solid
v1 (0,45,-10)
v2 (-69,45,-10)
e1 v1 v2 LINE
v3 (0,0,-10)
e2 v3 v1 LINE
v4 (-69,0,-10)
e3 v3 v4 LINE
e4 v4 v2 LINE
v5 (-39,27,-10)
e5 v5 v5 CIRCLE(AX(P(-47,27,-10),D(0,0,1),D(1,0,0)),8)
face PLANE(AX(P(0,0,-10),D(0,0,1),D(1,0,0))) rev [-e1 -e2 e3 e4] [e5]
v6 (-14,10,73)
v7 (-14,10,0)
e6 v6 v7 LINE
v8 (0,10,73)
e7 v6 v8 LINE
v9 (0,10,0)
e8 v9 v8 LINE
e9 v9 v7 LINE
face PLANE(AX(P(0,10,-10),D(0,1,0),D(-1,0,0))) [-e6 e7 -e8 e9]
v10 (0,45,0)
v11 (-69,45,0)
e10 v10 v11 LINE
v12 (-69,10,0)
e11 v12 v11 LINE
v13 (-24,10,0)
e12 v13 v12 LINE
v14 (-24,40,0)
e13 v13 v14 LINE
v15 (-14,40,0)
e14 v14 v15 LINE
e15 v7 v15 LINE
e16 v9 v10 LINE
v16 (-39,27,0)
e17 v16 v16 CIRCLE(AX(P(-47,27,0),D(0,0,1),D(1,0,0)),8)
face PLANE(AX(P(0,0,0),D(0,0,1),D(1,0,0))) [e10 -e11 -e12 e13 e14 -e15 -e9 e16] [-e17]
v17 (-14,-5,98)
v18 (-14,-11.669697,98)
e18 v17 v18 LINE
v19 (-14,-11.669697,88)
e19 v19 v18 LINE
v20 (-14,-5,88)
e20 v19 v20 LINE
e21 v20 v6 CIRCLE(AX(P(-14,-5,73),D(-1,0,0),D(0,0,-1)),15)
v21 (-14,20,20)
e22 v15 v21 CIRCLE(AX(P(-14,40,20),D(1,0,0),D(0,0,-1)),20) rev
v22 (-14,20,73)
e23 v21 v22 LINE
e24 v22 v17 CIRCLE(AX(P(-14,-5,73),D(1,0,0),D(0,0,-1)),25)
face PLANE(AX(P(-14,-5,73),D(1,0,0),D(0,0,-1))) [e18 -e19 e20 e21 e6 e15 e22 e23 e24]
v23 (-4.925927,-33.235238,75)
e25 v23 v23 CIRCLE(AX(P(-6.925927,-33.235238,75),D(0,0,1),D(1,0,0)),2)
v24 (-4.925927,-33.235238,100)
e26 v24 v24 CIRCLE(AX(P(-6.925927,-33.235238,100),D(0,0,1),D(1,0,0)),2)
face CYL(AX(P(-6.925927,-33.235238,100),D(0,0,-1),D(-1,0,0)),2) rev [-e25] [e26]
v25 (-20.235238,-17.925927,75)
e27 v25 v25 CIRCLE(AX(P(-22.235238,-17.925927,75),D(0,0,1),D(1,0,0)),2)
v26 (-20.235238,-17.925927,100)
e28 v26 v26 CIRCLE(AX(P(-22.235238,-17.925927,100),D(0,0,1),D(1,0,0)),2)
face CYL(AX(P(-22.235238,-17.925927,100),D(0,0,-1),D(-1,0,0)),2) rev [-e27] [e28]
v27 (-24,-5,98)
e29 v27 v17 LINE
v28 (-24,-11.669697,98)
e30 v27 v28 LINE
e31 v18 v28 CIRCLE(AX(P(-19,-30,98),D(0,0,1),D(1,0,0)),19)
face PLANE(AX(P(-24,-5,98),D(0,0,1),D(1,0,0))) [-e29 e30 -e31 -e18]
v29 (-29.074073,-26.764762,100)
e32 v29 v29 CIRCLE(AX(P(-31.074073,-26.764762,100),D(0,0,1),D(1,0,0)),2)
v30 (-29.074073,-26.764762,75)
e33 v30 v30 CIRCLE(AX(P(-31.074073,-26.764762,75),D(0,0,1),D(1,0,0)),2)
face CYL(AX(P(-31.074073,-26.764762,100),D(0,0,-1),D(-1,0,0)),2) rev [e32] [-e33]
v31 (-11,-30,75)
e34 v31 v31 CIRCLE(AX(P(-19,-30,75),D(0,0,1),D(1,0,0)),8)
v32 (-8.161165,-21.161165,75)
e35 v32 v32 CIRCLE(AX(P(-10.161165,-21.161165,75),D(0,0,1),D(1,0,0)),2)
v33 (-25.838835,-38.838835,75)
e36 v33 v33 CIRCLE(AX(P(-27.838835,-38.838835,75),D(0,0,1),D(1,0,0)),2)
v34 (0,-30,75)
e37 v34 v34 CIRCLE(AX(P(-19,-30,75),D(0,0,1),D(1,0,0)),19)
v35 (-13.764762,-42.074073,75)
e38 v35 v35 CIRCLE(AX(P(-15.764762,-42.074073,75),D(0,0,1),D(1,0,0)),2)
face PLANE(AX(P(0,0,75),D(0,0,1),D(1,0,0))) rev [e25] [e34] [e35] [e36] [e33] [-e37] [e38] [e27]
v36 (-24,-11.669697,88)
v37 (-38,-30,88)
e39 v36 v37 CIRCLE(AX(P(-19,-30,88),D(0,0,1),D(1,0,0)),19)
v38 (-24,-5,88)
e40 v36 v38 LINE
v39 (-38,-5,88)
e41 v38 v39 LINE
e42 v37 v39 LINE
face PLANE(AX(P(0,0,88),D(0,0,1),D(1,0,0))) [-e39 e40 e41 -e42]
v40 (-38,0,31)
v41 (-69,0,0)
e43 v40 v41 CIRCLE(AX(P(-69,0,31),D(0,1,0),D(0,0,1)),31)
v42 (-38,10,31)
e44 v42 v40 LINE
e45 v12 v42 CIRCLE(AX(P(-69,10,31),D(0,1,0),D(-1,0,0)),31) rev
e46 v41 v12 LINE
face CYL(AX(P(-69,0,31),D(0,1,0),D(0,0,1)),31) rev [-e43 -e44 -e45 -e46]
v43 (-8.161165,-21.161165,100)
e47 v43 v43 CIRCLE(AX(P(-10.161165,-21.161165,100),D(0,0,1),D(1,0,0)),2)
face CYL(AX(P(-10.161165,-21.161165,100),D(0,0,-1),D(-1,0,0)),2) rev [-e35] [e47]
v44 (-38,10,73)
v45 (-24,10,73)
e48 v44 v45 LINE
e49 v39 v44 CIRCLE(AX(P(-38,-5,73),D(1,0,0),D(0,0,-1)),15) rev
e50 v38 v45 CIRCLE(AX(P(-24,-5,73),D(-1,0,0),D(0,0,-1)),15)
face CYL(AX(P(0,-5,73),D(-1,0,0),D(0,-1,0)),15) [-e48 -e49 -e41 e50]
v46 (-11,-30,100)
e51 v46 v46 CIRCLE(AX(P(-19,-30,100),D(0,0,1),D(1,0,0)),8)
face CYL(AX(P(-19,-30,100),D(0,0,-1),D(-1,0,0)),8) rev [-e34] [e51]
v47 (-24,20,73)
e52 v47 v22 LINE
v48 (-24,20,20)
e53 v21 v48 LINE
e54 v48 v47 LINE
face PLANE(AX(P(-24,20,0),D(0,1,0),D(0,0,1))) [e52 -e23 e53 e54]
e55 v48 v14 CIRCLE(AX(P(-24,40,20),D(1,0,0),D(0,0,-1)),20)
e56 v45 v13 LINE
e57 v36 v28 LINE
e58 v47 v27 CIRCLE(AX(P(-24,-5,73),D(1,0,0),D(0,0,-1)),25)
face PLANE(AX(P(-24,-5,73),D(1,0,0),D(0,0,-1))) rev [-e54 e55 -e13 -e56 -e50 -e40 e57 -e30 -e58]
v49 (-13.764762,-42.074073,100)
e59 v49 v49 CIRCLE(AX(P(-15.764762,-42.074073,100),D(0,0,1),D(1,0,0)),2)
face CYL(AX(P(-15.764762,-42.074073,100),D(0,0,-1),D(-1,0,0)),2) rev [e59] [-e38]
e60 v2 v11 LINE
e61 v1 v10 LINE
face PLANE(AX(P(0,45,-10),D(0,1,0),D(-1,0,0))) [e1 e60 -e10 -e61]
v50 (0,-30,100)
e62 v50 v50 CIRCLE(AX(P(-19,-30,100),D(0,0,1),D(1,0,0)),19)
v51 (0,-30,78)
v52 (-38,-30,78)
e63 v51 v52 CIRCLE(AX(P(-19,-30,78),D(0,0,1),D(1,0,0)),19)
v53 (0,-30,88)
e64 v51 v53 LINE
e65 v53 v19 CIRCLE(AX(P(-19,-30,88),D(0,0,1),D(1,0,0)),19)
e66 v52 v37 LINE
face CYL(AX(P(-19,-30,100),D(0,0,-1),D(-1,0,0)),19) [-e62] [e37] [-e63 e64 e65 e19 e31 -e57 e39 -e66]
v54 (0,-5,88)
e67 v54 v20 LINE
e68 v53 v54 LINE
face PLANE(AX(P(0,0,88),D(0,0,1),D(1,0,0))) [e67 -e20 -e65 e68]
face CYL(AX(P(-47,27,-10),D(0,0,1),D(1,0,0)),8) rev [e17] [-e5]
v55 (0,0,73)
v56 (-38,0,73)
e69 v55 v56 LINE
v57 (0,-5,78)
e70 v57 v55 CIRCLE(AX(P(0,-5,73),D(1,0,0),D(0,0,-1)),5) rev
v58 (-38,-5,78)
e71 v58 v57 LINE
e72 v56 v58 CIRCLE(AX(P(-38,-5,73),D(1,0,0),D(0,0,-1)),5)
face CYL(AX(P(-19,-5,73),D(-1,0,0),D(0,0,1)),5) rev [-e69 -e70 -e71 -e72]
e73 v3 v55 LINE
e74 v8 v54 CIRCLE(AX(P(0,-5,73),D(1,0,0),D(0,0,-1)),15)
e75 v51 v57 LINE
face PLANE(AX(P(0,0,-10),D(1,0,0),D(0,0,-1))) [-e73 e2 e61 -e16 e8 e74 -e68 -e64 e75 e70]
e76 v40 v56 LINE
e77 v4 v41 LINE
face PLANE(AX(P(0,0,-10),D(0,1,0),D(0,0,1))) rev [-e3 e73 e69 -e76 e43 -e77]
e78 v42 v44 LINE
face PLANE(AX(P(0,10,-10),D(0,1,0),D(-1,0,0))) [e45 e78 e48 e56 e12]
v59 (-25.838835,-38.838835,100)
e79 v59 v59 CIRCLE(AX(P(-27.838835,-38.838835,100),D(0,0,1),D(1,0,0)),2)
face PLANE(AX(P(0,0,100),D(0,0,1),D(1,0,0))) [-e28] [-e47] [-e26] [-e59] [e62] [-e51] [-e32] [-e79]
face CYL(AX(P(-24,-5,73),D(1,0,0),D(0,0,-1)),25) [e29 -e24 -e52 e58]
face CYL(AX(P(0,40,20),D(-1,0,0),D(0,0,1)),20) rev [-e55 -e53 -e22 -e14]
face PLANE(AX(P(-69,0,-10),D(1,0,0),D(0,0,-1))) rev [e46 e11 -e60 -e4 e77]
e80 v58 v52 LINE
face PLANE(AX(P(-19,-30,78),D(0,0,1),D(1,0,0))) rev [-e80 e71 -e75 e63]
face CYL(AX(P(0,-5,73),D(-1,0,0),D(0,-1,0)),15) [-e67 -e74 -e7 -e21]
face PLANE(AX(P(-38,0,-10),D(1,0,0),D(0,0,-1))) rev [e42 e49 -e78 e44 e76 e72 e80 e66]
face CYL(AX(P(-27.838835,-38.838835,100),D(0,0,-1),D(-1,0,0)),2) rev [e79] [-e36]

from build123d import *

# Parameters (mm, degrees)
SKETCH1_R                = 8
BOSS_EXTRUDE1_DEPTH      = 10
BOSS_EXTRUDE3_DEPTH      = 88
BOSS_EXTRUDE3_DEPTH_BACK = 10
SKETCH1_4_W              = 38
SKETCH1_4_H              = 10
BOSS_EXTRUDE4_START      = 88
BOSS_EXTRUDE4_DEPTH      = 10
BOSS_EXTRUDE5_START      = 100
SKETCH1_6_R              = 19
SKETCH1_6_R_2            = 2
SKETCH1_6_R_3            = 8
BOSS_EXTRUDE5_DEPTH      = 25
SKETCH1_7_W              = 31
SKETCH1_7_H              = 10
BOSS_EXTRUDE6_DEPTH      = 10
FILLET1_R                = 31
FILLET3_R                = 5
FILLET4_R                = 15
BOSS_EXTRUDE7_START      = -24
BOSS_EXTRUDE7_DEPTH      = 10
FILLET5_R                = 20


with BuildPart() as part:
    # Sketch1 → Boss-Extrude1 (new body)
    with BuildSketch(Plane.XY):
        Polygon((-38, 10), (0, 10), (0, 45), (-69, 45), (-69, 10), align=None)
        with Locations((-47, 27)):
            Circle(SKETCH1_R, mode=Mode.SUBTRACT)
    extrude(amount=-BOSS_EXTRUDE1_DEPTH)

    # Sketch1<4> → Boss-Extrude3 (add, two sides: drawn at the far end of the back side and taken through both)
    with BuildSketch(Plane.XY.offset(-BOSS_EXTRUDE3_DEPTH_BACK)):
        with Locations((-19, 5)):
            Rectangle(SKETCH1_4_W, SKETCH1_4_H)
    extrude(amount=BOSS_EXTRUDE3_DEPTH + BOSS_EXTRUDE3_DEPTH_BACK)

    # Sketch1<5> → Boss-Extrude4 (add)
    with BuildSketch(Plane.XY.offset(BOSS_EXTRUDE4_START)):
        with BuildLine():
            Line((0, -30), (0, 0))
            Line((0, 0), (-38, 0))
            Line((-38, 0), (-38, -30))
            ThreePointArc((-38, -30), (-19, -11), (0, -30))
        make_face()
    extrude(amount=-BOSS_EXTRUDE4_DEPTH)

    # Sketch1<6> → Boss-Extrude5 (add)
    with BuildSketch(Plane.XY.offset(BOSS_EXTRUDE5_START)):
        with Locations((-19, -30)):
            Circle(SKETCH1_6_R)
        with Locations((-22.235238064, -17.925927171)):
            Circle(SKETCH1_6_R_2, mode=Mode.SUBTRACT)
        with Locations((-31.074072829, -26.764761936)):
            Circle(SKETCH1_6_R_2, mode=Mode.SUBTRACT)
        with Locations((-27.838834765, -38.838834765)):
            Circle(SKETCH1_6_R_2, mode=Mode.SUBTRACT)
        with Locations((-15.764761936, -42.074072829)):
            Circle(SKETCH1_6_R_2, mode=Mode.SUBTRACT)
        with Locations((-6.925927171, -33.235238064)):
            Circle(SKETCH1_6_R_2, mode=Mode.SUBTRACT)
        with Locations((-10.161165235, -21.161165235)):
            Circle(SKETCH1_6_R_2, mode=Mode.SUBTRACT)
        with Locations((-19, -30)):
            Circle(SKETCH1_6_R_3, mode=Mode.SUBTRACT)
    extrude(amount=-BOSS_EXTRUDE5_DEPTH)

    # Sketch1<7> → Boss-Extrude6 (add)
    with BuildSketch(Plane.XY):
        with Locations((-53.5, 5)):
            Rectangle(SKETCH1_7_W, SKETCH1_7_H)
    extrude(amount=-BOSS_EXTRUDE6_DEPTH)

    # Fillet1
    fillet1_edges = [part.edges().sort_by_distance(p)[0] for p in [
        (-38, 5, 0),
    ]]
    fillet(fillet1_edges, radius=FILLET1_R - 0.0001)  # a hair under: the kernel refuses the full size

    # Fillet3
    fillet3_edges = [part.edges().sort_by_distance(p)[0] for p in [
        (-19, 0, 78),
    ]]
    fillet(fillet3_edges, radius=FILLET3_R)

    # Fillet4
    fillet4_edges = [part.edges().sort_by_distance(p)[0] for p in [
        (-19, 10, 88),
    ]]
    fillet(fillet4_edges, radius=FILLET4_R)

    # Sketch2 → Boss-Extrude7 (add)
    with BuildSketch(Plane(origin=(0, 0, 0), x_dir=(0, 0, -1), z_dir=(1, 0, 0)).offset(BOSS_EXTRUDE7_START)):
        with BuildLine():
            Line((-98, -13), (-88, -13))
            Line((-88, -13), (-88, -5))
            ThreePointArc((-88, -5), (-83.606601718, 5.606601718), (-73, 10))
            Line((-73, 10), (0, 10))
            Line((0, 10), (0, 20))
            Line((0, 20), (-73, 20))
            ThreePointArc((-73, 20), (-90.67766953, 12.67766953), (-98, -5))
            Line((-98, -5), (-98, -13))
        make_face()
    extrude(amount=BOSS_EXTRUDE7_DEPTH)

    # Fillet5
    fillet5_edges = [part.edges().sort_by_distance(p)[0] for p in [
        (-19, 20, 0),
    ]]
    fillet(fillet5_edges, radius=FILLET5_R)


solid = part.part
